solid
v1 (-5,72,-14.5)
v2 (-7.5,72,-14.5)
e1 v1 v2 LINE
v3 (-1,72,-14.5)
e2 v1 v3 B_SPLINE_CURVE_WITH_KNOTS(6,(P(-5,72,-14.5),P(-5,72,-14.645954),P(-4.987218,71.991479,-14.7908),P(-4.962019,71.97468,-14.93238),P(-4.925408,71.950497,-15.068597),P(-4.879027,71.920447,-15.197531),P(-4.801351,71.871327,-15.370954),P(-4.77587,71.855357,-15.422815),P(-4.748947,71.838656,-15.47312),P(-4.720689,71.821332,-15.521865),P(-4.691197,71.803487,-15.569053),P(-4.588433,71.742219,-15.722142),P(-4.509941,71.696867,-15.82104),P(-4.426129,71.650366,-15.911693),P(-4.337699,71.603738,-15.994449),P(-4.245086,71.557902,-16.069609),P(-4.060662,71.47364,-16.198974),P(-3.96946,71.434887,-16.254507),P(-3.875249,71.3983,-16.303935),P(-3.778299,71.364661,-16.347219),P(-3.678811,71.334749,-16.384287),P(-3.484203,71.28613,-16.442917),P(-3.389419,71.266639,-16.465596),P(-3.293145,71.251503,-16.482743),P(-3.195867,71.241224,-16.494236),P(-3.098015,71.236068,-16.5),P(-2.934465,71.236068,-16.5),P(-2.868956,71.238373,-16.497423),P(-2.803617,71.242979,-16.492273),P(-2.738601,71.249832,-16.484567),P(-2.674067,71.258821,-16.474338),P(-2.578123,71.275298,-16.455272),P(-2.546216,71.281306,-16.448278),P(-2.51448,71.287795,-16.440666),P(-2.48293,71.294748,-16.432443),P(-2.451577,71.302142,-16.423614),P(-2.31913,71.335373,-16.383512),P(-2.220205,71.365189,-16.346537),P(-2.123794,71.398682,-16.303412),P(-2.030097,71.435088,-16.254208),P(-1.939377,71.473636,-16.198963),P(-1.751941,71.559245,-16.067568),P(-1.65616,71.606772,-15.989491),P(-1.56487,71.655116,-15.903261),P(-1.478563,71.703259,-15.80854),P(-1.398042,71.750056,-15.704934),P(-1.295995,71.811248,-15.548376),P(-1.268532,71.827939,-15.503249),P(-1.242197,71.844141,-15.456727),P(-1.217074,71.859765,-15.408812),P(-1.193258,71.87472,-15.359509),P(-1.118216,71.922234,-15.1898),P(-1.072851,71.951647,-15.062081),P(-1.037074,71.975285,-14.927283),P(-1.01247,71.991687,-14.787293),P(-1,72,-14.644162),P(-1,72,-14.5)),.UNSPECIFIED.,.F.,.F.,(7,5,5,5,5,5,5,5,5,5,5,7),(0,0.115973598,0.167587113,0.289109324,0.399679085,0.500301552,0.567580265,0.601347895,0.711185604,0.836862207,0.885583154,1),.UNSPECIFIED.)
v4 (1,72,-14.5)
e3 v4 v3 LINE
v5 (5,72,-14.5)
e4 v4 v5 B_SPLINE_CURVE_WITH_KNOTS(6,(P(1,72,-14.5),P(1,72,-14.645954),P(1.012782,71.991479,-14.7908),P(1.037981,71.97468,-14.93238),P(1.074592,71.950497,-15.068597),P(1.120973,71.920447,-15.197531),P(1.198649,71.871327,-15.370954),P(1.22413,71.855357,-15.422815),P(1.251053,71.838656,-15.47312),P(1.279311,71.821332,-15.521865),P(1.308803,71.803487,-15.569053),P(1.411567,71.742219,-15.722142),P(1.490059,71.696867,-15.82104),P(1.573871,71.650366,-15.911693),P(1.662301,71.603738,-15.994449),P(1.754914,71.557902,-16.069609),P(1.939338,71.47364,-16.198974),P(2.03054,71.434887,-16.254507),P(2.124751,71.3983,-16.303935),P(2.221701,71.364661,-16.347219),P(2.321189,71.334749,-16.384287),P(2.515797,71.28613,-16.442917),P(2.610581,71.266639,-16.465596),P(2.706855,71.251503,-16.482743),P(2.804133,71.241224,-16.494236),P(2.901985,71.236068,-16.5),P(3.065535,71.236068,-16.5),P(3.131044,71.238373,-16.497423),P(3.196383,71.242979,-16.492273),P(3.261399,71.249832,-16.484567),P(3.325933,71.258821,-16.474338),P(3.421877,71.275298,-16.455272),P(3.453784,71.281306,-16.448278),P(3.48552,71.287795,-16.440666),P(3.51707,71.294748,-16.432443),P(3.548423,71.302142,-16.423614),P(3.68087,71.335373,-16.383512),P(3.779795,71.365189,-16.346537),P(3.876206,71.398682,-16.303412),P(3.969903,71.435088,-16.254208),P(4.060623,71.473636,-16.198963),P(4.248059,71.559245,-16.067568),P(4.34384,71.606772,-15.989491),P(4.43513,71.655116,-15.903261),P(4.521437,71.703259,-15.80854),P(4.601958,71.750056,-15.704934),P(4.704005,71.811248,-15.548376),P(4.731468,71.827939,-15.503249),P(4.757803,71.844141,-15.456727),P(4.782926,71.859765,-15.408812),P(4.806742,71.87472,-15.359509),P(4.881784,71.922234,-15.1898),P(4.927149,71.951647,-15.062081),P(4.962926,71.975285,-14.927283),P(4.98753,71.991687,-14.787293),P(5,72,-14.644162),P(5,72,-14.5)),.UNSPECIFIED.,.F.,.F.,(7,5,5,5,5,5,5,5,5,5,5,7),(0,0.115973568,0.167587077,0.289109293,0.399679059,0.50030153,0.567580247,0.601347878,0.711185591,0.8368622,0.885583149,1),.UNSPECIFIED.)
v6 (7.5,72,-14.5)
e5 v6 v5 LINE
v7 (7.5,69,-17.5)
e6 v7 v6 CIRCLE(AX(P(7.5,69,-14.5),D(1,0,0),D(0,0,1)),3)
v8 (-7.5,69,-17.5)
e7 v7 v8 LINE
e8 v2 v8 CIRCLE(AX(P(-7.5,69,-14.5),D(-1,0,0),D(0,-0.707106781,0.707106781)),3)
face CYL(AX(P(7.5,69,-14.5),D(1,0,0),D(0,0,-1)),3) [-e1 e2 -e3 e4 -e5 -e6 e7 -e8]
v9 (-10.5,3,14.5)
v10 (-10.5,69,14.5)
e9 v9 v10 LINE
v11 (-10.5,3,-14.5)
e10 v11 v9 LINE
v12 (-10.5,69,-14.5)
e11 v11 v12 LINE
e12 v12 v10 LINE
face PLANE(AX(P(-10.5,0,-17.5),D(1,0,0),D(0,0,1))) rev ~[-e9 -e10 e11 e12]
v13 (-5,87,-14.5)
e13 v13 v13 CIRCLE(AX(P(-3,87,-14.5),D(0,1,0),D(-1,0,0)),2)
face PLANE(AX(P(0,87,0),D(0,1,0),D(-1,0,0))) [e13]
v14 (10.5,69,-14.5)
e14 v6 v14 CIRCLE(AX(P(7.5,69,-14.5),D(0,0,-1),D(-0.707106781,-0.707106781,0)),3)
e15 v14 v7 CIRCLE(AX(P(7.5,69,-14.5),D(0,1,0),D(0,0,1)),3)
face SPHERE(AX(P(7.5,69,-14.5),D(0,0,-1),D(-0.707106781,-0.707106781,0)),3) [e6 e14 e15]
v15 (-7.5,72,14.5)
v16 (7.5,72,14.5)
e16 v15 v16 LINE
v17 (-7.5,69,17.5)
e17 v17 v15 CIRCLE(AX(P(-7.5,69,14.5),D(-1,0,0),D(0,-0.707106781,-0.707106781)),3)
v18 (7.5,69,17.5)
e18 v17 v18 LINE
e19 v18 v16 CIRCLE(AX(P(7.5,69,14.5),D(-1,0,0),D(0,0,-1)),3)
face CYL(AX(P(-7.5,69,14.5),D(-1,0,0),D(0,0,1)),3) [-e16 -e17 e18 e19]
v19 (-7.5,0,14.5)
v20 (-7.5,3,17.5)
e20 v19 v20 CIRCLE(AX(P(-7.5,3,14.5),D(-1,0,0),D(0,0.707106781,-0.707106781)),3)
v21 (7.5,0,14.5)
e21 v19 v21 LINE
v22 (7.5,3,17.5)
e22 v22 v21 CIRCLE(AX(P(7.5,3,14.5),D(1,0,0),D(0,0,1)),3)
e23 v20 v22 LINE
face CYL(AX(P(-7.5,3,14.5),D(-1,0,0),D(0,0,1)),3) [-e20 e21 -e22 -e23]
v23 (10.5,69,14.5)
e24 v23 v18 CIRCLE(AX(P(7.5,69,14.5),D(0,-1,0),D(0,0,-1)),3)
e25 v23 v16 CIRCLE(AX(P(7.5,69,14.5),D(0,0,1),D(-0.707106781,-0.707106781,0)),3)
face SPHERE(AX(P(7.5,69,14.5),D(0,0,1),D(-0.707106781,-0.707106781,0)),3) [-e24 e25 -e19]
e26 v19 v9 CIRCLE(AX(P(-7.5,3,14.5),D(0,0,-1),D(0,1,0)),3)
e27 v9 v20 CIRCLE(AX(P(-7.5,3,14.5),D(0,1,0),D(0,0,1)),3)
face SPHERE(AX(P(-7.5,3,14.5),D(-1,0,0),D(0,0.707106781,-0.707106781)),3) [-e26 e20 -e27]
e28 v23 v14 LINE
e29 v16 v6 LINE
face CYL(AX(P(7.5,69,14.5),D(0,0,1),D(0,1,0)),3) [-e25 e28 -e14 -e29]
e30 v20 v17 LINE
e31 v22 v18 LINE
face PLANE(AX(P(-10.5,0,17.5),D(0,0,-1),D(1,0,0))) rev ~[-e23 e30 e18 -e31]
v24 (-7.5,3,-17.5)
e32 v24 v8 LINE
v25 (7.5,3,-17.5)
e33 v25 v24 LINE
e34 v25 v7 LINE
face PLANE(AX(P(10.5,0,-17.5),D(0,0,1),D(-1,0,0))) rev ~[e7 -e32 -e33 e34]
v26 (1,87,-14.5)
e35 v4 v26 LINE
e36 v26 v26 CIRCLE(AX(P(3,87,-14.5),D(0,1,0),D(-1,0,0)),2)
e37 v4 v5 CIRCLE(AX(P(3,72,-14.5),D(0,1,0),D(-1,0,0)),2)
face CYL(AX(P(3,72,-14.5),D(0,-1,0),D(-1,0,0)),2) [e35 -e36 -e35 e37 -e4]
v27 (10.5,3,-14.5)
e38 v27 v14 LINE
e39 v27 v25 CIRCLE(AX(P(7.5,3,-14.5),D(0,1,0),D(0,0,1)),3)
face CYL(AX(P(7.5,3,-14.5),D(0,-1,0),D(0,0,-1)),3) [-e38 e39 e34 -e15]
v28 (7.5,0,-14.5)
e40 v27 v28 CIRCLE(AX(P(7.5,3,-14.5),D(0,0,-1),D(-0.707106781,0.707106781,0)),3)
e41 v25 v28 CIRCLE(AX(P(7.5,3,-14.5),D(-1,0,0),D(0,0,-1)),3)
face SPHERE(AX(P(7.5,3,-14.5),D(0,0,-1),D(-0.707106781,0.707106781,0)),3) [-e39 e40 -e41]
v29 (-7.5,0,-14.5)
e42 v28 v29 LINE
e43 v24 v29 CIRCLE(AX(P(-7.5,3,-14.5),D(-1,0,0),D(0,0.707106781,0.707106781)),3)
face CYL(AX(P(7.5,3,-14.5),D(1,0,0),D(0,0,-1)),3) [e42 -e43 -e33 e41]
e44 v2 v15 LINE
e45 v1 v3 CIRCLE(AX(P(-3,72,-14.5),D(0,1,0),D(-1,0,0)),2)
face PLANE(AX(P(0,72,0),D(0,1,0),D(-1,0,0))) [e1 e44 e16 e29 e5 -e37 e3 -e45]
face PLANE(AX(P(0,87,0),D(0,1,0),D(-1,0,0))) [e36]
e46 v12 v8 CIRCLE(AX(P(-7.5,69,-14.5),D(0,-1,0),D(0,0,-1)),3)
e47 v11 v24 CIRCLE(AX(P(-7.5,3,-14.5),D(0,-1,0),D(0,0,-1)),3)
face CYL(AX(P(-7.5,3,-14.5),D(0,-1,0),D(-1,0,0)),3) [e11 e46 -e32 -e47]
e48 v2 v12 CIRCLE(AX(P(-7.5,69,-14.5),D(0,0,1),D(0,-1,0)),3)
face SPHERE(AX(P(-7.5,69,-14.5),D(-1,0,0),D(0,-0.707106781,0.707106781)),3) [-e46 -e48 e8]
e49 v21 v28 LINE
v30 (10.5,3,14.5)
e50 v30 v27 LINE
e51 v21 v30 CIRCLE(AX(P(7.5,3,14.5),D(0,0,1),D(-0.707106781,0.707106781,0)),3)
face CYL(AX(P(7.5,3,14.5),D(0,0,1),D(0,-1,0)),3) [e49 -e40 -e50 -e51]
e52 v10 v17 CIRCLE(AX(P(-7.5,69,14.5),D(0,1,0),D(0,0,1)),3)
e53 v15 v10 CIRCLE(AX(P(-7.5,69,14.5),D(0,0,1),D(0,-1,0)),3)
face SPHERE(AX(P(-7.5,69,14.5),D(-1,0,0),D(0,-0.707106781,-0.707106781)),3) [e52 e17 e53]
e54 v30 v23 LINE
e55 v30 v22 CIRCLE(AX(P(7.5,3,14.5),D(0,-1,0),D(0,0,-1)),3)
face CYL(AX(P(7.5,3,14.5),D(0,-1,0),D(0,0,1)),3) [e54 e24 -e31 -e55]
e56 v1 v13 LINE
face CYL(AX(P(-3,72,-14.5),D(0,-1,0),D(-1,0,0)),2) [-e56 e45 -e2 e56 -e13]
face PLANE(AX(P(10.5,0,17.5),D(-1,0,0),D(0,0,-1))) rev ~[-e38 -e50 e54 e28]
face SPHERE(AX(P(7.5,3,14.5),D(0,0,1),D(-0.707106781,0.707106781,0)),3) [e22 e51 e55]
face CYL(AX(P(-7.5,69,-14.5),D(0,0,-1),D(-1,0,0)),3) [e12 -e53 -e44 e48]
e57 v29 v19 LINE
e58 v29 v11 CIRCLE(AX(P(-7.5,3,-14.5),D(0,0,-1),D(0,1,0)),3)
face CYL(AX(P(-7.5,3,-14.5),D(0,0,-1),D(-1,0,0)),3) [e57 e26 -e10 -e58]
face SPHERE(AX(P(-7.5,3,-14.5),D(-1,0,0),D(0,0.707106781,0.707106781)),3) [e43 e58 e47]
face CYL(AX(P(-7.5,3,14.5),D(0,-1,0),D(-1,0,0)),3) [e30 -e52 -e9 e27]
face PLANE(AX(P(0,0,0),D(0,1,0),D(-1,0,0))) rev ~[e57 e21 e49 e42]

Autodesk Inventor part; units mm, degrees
ref_plane "YZ Plane" through (0, 0, 0) normal (1, 0, 0) x (0, 1, 0)
ref_plane "XZ Plane" through (0, 0, 0) normal (0, 1, 0) x (-1, 0, 0)
ref_plane "XY Plane" through (0, 0, 0) normal (0, 0, 1) x (1, 0, 0)
sketch "Sketch1" plane through (0, 0, 0) normal (0, 1, 0) x (-1, 0, 0)
  line L0 (10.5, 17.5) -> (-10.5, 17.5)
  line L1 (-10.5, 17.5) -> (-10.5, -17.5)
  line L2 (-10.5, -17.5) -> (10.5, -17.5)
  line L3 (10.5, -17.5) -> (10.5, 17.5)
  line L4 (10.5, 17.5) -> (-10.5, -17.5) construction
  line L5 (-10.5, 17.5) -> (10.5, -17.5) construction
  line L6 (0, -17.5) -> (0, -14.5) construction
  line L7 (0, -14.5) -> (3, -14.5) construction
  circle A0 centre (3, -14.5) radius 2
  circle A1 centre (-3, -14.5) radius 2
  point P0 (0, 0)
  dimension "d0" = 21
  dimension "d1" = 35
  dimension "d5" = 3
  dimension "d6" = 3
  dimension "d7" = 4
extrude "Extrusion1" add sketch "Sketch1" along normal blind 72 contours L3 L2 L1 L0 | A0 | A1
extrude "Extrusion2" add sketch "Sketch1" along normal blind 15 from surface at 72 contours A0 | A1
fillet "Fillet1" radius 3 12 edges at (10.5, 36, 17.5) (10.5, 36, -17.5) (-10.5, 36, 17.5) (-10.5, 36, -17.5) (10.5, 72, 0) (0, 72, 17.5) (0, 72, -17.5) (-10.5, 72, 0) (10.5, 0, 0) (0, 0, 17.5) (-10.5, 0, 0) (0, 0, -17.5)
properties part number "SLS X-CUBE 1250mAh 3S1P 11,1V 60"
